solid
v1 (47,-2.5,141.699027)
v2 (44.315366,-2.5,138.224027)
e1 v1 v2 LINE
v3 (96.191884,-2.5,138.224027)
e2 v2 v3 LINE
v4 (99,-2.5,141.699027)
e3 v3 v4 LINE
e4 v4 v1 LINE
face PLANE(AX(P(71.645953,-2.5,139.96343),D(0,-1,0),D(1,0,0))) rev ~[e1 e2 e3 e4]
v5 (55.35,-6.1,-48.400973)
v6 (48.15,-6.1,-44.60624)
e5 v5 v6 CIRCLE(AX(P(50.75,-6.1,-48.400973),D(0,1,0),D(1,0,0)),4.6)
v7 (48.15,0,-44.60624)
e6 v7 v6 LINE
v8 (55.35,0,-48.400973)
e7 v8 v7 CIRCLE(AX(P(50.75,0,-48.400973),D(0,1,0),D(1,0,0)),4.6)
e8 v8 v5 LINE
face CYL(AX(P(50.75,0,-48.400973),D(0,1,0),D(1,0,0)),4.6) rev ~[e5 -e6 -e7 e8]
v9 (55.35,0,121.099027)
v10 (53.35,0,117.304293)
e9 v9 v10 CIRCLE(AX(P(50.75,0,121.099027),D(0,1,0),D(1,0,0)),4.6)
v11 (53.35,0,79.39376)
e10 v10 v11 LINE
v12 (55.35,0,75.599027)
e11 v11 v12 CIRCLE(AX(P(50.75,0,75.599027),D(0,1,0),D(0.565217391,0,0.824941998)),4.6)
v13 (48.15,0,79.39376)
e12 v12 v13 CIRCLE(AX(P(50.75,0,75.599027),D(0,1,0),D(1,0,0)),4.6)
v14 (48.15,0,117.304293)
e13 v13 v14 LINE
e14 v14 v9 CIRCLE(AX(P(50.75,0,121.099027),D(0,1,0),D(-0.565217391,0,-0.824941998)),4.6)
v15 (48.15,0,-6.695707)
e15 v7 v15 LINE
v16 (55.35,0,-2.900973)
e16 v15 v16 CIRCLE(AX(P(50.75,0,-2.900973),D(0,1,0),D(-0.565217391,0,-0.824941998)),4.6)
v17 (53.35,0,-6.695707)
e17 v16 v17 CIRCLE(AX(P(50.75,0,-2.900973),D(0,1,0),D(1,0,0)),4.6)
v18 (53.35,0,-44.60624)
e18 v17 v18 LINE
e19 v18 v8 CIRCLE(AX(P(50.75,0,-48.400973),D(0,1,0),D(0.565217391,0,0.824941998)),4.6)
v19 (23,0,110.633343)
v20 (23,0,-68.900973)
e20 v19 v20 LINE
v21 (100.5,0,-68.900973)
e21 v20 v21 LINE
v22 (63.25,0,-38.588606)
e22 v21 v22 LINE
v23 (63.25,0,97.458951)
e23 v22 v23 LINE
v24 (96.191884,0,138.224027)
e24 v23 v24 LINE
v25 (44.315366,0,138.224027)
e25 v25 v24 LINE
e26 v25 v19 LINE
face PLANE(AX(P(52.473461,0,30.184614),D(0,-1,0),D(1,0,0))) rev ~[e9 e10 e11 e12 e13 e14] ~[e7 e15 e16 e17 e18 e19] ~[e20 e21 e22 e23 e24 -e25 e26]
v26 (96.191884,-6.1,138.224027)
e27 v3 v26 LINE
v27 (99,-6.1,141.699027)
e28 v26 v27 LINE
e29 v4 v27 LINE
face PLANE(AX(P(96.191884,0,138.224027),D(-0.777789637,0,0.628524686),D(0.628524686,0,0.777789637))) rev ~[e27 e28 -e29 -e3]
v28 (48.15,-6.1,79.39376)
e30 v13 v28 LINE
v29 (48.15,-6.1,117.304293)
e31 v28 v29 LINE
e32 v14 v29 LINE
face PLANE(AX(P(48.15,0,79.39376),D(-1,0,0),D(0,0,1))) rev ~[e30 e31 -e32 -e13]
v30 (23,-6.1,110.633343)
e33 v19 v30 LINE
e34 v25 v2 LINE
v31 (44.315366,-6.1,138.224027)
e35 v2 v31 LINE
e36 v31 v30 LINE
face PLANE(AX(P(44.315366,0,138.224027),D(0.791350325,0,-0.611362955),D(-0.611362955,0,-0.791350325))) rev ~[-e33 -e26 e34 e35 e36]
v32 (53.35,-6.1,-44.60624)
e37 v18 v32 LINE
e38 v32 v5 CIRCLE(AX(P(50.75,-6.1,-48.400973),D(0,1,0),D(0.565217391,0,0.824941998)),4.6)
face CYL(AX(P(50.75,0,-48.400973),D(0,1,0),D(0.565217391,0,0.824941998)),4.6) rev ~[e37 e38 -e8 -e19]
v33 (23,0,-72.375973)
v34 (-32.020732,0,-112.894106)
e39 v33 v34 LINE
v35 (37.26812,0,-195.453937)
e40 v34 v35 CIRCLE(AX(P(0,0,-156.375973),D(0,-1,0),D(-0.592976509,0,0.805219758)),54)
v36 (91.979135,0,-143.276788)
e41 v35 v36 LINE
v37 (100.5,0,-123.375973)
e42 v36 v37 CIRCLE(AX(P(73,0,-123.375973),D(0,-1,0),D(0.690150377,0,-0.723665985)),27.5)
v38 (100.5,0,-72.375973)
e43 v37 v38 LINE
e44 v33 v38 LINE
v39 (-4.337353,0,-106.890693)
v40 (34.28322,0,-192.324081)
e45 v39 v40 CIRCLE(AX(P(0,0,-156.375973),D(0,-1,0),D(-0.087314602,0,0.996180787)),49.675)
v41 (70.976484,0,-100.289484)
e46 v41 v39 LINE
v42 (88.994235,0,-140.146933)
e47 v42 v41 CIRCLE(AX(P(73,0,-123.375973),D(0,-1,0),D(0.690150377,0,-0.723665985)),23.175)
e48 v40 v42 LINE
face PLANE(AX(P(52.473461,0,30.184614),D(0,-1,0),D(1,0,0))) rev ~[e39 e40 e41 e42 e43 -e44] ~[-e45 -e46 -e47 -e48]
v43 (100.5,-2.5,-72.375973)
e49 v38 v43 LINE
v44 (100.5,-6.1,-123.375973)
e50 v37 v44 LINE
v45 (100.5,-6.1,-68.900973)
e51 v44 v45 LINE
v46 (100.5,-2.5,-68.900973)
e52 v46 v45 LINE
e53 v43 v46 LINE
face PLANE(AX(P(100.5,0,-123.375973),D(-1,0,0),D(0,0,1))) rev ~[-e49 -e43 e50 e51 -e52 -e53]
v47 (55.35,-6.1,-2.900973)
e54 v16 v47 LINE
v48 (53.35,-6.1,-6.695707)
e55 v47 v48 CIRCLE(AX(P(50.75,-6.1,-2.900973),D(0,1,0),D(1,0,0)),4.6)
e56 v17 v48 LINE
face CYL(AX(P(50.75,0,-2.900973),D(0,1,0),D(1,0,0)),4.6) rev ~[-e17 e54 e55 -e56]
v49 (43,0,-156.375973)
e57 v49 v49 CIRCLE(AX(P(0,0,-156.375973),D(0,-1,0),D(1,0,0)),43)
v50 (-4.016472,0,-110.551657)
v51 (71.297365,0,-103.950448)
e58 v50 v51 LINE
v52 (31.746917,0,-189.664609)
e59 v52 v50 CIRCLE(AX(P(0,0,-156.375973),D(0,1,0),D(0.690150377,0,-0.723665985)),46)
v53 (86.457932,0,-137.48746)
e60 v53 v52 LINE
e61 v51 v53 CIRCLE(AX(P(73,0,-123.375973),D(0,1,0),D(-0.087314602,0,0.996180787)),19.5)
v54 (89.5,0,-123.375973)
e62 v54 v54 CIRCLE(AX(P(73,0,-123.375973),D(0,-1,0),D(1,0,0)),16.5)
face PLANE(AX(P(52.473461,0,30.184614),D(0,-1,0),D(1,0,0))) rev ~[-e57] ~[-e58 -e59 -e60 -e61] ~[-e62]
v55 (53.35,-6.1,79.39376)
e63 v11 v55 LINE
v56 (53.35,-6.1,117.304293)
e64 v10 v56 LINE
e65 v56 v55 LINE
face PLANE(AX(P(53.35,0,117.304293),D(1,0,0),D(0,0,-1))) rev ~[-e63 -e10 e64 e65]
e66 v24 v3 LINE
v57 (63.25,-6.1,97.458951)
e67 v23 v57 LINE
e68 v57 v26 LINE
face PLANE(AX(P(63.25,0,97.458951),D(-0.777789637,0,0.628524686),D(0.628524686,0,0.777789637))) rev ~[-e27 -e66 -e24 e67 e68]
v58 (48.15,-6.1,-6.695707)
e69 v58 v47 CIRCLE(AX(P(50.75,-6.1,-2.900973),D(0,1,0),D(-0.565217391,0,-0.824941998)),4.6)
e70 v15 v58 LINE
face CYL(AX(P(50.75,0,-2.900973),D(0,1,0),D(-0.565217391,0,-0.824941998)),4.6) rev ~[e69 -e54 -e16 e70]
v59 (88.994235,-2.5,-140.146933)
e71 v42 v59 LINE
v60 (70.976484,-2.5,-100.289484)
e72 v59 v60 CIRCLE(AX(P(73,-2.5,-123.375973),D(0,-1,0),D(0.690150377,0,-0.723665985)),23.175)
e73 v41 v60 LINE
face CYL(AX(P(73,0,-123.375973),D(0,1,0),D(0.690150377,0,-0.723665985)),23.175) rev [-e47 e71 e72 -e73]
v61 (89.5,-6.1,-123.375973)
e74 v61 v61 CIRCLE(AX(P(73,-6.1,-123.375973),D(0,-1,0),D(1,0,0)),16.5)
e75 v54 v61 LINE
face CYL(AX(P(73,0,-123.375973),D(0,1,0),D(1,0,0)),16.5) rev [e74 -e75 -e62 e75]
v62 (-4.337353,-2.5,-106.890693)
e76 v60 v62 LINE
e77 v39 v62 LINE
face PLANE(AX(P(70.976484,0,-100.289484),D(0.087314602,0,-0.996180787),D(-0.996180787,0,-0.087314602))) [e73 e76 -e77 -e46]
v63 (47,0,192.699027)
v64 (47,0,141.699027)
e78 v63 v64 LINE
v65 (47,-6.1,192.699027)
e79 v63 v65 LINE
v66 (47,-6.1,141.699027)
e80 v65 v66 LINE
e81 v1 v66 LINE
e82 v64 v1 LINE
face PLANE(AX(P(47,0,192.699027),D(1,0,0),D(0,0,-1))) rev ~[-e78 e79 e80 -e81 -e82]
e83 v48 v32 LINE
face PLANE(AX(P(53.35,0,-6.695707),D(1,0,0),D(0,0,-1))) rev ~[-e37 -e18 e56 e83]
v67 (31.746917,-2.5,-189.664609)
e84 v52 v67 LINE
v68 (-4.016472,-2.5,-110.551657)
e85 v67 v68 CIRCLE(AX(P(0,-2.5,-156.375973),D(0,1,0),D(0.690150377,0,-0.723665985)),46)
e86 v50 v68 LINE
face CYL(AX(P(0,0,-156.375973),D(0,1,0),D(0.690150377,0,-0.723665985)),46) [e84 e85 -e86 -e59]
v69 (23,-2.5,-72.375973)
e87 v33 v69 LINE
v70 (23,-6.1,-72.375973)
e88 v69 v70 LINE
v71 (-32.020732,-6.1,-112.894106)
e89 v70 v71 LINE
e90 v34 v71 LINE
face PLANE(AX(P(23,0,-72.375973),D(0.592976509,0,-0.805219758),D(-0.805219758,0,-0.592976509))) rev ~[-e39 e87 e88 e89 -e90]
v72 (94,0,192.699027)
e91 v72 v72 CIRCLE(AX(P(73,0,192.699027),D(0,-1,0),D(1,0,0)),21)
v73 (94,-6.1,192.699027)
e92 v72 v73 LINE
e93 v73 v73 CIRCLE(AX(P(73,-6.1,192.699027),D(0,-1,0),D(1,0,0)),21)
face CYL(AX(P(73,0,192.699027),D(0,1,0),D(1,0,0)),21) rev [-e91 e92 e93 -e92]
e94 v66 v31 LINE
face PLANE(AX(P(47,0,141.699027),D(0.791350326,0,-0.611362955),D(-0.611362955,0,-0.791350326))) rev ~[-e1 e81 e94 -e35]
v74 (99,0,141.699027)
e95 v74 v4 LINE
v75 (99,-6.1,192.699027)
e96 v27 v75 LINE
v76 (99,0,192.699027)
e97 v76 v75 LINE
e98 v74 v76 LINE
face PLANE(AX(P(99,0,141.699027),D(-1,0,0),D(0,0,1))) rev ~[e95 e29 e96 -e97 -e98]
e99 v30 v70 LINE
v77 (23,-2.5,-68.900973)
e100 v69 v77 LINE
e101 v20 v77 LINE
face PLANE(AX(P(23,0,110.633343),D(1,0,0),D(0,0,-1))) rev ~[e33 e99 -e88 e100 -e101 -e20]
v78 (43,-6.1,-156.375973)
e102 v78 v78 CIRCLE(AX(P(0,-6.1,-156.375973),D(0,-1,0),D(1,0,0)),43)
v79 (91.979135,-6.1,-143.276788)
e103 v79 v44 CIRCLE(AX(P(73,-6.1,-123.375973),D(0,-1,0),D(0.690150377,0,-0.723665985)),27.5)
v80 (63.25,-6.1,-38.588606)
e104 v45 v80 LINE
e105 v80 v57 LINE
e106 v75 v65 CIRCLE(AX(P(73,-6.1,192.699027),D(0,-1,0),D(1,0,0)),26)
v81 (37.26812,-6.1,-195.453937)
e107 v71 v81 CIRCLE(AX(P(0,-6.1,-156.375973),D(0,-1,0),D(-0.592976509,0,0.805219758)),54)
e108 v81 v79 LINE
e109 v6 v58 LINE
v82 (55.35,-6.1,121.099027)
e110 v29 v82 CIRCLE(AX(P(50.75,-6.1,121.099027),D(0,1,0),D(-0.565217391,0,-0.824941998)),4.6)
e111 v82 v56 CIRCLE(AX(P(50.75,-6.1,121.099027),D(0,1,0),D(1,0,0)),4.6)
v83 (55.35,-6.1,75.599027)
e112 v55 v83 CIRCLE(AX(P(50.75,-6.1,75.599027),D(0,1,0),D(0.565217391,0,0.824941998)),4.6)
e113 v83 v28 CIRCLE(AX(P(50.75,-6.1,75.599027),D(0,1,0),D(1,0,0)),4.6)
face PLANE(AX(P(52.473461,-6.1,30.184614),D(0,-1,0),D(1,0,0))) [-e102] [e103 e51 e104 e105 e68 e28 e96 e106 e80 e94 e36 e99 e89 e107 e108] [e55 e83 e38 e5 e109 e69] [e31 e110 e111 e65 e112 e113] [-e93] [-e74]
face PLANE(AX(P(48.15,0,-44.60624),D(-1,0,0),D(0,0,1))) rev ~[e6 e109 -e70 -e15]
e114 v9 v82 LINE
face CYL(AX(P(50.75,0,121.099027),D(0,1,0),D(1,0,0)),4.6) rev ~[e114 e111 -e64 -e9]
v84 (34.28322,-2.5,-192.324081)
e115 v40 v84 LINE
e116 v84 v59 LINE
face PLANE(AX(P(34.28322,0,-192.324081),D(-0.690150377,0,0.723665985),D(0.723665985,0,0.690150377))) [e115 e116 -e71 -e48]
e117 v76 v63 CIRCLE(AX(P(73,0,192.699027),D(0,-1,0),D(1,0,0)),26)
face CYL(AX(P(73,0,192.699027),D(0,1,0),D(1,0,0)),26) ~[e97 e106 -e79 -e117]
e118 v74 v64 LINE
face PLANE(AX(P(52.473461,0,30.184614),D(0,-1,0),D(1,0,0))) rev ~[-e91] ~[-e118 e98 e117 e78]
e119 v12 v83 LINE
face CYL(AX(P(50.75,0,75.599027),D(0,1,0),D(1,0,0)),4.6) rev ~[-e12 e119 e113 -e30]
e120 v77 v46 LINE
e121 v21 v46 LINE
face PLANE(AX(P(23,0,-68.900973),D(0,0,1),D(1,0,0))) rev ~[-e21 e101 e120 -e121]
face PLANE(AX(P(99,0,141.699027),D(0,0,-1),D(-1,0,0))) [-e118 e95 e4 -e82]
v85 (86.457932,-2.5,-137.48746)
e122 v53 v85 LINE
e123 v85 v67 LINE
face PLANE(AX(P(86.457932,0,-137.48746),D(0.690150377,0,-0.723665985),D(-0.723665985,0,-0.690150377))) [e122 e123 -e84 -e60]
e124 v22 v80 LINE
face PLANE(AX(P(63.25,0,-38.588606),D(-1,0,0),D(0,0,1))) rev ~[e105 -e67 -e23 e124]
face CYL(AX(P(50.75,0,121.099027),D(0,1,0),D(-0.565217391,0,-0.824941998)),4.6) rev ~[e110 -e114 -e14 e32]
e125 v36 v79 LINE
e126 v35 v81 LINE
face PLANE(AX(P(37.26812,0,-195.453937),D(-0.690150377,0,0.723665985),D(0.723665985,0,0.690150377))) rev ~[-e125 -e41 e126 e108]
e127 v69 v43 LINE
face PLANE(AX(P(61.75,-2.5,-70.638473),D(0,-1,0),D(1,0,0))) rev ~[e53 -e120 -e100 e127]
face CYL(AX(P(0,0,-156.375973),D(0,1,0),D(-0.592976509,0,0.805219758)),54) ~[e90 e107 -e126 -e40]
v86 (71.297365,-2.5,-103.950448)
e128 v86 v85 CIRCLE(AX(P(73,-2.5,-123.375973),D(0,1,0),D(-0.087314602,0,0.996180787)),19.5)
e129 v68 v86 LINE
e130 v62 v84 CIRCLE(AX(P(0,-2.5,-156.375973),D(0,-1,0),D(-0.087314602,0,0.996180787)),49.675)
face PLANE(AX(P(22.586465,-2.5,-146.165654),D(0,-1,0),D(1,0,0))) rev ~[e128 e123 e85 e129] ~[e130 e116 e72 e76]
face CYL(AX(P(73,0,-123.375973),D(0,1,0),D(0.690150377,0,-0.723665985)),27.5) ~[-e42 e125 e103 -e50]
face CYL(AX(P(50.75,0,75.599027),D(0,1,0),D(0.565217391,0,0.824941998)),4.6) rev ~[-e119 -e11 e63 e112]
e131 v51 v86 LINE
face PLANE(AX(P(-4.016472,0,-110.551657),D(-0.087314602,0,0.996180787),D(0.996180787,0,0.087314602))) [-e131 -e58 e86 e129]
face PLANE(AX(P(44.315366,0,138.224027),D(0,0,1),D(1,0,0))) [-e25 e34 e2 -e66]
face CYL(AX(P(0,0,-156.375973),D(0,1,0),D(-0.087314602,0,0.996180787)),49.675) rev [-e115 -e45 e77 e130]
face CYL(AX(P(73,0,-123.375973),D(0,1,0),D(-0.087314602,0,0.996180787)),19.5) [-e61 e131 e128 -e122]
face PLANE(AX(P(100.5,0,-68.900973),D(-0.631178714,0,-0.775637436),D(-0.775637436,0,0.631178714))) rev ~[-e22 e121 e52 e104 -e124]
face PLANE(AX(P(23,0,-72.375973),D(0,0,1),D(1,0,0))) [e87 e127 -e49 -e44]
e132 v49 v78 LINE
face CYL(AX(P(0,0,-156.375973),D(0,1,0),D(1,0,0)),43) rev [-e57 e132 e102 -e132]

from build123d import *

# Parameters (mm, degrees)
F1_W     = 77.5
F1_H     = 3.475
F1_R     = 21
F1_R_2   = 43
F1_R_3   = 16.5
F2_DEPTH = 6.1
F3_DEPTH = 2.5


with BuildPart() as f2:
    # F1 (on Front) → F2 (new body)
    with BuildSketch(Plane.XZ):
        Polygon((100.5, -68.9009734364), (63.25, -38.5886058211), (63.25, 97.4589511752), (96.191884306, 138.2240265636), (44.3153656491, 138.2240265636), (23, 110.6333434582), (23, -68.9009734364), align=None)
        with BuildLine():
            Line((53.35, -27.8899289966), (53.35, -44.6062402442))
            ThreePointArc((53.35, -44.6062402442), (54.8193979899, -46.2562123774), (55.35, -48.4009734364))
            ThreePointArc((55.35, -48.4009734364), (48.605238941, -52.4703714262), (48.15, -44.6062402442))
            Line((48.15, -44.6062402442), (48.15, -27.8899289966))
            Line((48.15, -27.8899289966), (48.15, -25.6509734364))
            Line((48.15, -25.6509734364), (48.15, -23.4120178762))
            Line((48.15, -23.4120178762), (48.15, -6.6957066286))
            ThreePointArc((48.15, -6.6957066286), (48.605238941, 1.1684245535), (55.35, -2.9009734364))
            ThreePointArc((55.35, -2.9009734364), (54.8193979899, -5.0457344953), (53.35, -6.6957066286))
            Line((53.35, -6.6957066286), (53.35, -23.4120178762))
            Line((53.35, -23.4120178762), (53.35, -25.6509734364))
            Line((53.35, -25.6509734364), (53.35, -27.8899289966))
        make_face(mode=Mode.SUBTRACT)
        with BuildLine():
            Line((53.35, 98.1746025085), (53.35, 79.3937597558))
            ThreePointArc((53.35, 79.3937597558), (54.8193979899, 77.7437876226), (55.35, 75.5990265636))
            ThreePointArc((55.35, 75.5990265636), (48.605238941, 71.5296285738), (48.15, 79.3937597558))
            Line((48.15, 79.3937597558), (48.15, 98.1746025085))
            Line((48.15, 98.1746025085), (48.15, 98.3490265636))
            Line((48.15, 98.3490265636), (48.15, 98.5234506187))
            Line((48.15, 98.5234506187), (48.15, 117.3042933714))
            ThreePointArc((48.15, 117.3042933714), (48.605238941, 125.1684245535), (55.35, 121.0990265636))
            ThreePointArc((55.35, 121.0990265636), (54.8193979899, 118.9542655047), (53.35, 117.3042933714))
            Line((53.35, 117.3042933714), (53.35, 98.5234506187))
            Line((53.35, 98.5234506187), (53.35, 98.3490265636))
            Line((53.35, 98.3490265636), (53.35, 98.1746025085))
        make_face(mode=Mode.SUBTRACT)
        with Locations((61.75, -70.6384734364)):
            Rectangle(F1_W, F1_H)
        Polygon((44.3153656491, 138.2240265636), (96.191884306, 138.2240265636), (99, 141.6990265636), (47, 141.6990265636), align=None)
        with BuildLine():
            Line((100.5, -123.3759734364), (100.5, -72.3759734364))
            Line((100.5, -72.3759734364), (23, -72.3759734364))
            Line((23, -72.3759734364), (-32.0207315003, -112.894106478))
            ThreePointArc((-32.0207315003, -112.894106478), (-41.3632102296, -191.0903053398), (37.2681203413, -195.4539366155))
            Line((37.2681203413, -195.4539366155), (91.979135359, -143.2767880183))
            ThreePointArc((91.979135359, -143.2767880183), (98.2801920718, -134.200107989), (100.5, -123.3759734364))
        make_face()
        with BuildLine():
            ThreePointArc((34.2832199621, -192.3240812312), (-45.2648285285, -176.8381561958), (-4.3373528695, -106.8906928462))
            Line((-4.3373528695, -106.8906928462), (70.9764840916, -100.2894836995))
            ThreePointArc((70.9764840916, -100.2894836995), (94.11751185, -113.8297009562), (88.9942349798, -140.1469326341))
            Line((88.9942349798, -140.1469326341), (34.2832199621, -192.3240812312))
        make_face(mode=Mode.SUBTRACT)
        with BuildLine():
            Line((47, 141.6990265636), (99, 141.6990265636))
            Line((99, 141.6990265636), (99, 192.6990265636))
            ThreePointArc((99, 192.6990265636), (73, 218.6990265636), (47, 192.6990265636))
            Line((47, 192.6990265636), (47, 141.6990265636))
        make_face()
        with Locations((73, 192.6990265636)):
            Circle(F1_R, mode=Mode.SUBTRACT)
        with BuildLine():
            Line((70.9764840916, -100.2894836995), (-4.3373528695, -106.8906928462))
            ThreePointArc((-4.3373528695, -106.8906928462), (-45.2648285285, -176.8381561958), (34.2832199621, -192.3240812312))
            Line((34.2832199621, -192.3240812312), (88.9942349798, -140.1469326341))
            ThreePointArc((88.9942349798, -140.1469326341), (94.11751185, -113.8297009562), (70.9764840916, -100.2894836995))
        make_face()
        with BuildLine():
            Line((-4.016471706, -110.5516572381), (71.297365255, -103.9504480915))
            ThreePointArc((71.297365255, -103.9504480915), (90.7687801974, -115.3435111553), (86.4579323455, -137.4874601399))
            Line((86.4579323455, -137.4874601399), (31.7469173277, -189.6646087371))
            ThreePointArc((31.7469173277, -189.6646087371), (-41.9160968759, -175.3243459967), (-4.016471706, -110.5516572381))
        make_face(mode=Mode.SUBTRACT)
        with BuildLine():
            ThreePointArc((86.4579323455, -137.4874601399), (90.7687801974, -115.3435111553), (71.297365255, -103.9504480915))
            Line((71.297365255, -103.9504480915), (-4.016471706, -110.5516572381))
            ThreePointArc((-4.016471706, -110.5516572381), (-41.9160968759, -175.3243459967), (31.7469173277, -189.6646087371))
            Line((31.7469173277, -189.6646087371), (86.4579323455, -137.4874601399))
        make_face()
        with Locations((0, -156.3759734364)):
            Circle(F1_R_2, mode=Mode.SUBTRACT)
        with Locations((73, -123.3759734364)):
            Circle(F1_R_3, mode=Mode.SUBTRACT)
    extrude(amount=F2_DEPTH)

    # F1 (on Front) → F3 (cut)
    with BuildSketch(Plane.XZ):
        Polygon((44.3153656491, 138.2240265636), (96.191884306, 138.2240265636), (99, 141.6990265636), (47, 141.6990265636), align=None)
        with Locations((61.75, -70.6384734364)):
            Rectangle(F1_W, F1_H)
        with BuildLine():
            Line((70.9764840916, -100.2894836995), (-4.3373528695, -106.8906928462))
            ThreePointArc((-4.3373528695, -106.8906928462), (-45.2648285285, -176.8381561958), (34.2832199621, -192.3240812312))
            Line((34.2832199621, -192.3240812312), (88.9942349798, -140.1469326341))
            ThreePointArc((88.9942349798, -140.1469326341), (94.11751185, -113.8297009562), (70.9764840916, -100.2894836995))
        make_face()
        with BuildLine():
            Line((-4.016471706, -110.5516572381), (71.297365255, -103.9504480915))
            ThreePointArc((71.297365255, -103.9504480915), (90.7687801974, -115.3435111553), (86.4579323455, -137.4874601399))
            Line((86.4579323455, -137.4874601399), (31.7469173277, -189.6646087371))
            ThreePointArc((31.7469173277, -189.6646087371), (-41.9160968759, -175.3243459967), (-4.016471706, -110.5516572381))
        make_face(mode=Mode.SUBTRACT)
    extrude(amount=F3_DEPTH, mode=Mode.SUBTRACT)


solid = f2.part
